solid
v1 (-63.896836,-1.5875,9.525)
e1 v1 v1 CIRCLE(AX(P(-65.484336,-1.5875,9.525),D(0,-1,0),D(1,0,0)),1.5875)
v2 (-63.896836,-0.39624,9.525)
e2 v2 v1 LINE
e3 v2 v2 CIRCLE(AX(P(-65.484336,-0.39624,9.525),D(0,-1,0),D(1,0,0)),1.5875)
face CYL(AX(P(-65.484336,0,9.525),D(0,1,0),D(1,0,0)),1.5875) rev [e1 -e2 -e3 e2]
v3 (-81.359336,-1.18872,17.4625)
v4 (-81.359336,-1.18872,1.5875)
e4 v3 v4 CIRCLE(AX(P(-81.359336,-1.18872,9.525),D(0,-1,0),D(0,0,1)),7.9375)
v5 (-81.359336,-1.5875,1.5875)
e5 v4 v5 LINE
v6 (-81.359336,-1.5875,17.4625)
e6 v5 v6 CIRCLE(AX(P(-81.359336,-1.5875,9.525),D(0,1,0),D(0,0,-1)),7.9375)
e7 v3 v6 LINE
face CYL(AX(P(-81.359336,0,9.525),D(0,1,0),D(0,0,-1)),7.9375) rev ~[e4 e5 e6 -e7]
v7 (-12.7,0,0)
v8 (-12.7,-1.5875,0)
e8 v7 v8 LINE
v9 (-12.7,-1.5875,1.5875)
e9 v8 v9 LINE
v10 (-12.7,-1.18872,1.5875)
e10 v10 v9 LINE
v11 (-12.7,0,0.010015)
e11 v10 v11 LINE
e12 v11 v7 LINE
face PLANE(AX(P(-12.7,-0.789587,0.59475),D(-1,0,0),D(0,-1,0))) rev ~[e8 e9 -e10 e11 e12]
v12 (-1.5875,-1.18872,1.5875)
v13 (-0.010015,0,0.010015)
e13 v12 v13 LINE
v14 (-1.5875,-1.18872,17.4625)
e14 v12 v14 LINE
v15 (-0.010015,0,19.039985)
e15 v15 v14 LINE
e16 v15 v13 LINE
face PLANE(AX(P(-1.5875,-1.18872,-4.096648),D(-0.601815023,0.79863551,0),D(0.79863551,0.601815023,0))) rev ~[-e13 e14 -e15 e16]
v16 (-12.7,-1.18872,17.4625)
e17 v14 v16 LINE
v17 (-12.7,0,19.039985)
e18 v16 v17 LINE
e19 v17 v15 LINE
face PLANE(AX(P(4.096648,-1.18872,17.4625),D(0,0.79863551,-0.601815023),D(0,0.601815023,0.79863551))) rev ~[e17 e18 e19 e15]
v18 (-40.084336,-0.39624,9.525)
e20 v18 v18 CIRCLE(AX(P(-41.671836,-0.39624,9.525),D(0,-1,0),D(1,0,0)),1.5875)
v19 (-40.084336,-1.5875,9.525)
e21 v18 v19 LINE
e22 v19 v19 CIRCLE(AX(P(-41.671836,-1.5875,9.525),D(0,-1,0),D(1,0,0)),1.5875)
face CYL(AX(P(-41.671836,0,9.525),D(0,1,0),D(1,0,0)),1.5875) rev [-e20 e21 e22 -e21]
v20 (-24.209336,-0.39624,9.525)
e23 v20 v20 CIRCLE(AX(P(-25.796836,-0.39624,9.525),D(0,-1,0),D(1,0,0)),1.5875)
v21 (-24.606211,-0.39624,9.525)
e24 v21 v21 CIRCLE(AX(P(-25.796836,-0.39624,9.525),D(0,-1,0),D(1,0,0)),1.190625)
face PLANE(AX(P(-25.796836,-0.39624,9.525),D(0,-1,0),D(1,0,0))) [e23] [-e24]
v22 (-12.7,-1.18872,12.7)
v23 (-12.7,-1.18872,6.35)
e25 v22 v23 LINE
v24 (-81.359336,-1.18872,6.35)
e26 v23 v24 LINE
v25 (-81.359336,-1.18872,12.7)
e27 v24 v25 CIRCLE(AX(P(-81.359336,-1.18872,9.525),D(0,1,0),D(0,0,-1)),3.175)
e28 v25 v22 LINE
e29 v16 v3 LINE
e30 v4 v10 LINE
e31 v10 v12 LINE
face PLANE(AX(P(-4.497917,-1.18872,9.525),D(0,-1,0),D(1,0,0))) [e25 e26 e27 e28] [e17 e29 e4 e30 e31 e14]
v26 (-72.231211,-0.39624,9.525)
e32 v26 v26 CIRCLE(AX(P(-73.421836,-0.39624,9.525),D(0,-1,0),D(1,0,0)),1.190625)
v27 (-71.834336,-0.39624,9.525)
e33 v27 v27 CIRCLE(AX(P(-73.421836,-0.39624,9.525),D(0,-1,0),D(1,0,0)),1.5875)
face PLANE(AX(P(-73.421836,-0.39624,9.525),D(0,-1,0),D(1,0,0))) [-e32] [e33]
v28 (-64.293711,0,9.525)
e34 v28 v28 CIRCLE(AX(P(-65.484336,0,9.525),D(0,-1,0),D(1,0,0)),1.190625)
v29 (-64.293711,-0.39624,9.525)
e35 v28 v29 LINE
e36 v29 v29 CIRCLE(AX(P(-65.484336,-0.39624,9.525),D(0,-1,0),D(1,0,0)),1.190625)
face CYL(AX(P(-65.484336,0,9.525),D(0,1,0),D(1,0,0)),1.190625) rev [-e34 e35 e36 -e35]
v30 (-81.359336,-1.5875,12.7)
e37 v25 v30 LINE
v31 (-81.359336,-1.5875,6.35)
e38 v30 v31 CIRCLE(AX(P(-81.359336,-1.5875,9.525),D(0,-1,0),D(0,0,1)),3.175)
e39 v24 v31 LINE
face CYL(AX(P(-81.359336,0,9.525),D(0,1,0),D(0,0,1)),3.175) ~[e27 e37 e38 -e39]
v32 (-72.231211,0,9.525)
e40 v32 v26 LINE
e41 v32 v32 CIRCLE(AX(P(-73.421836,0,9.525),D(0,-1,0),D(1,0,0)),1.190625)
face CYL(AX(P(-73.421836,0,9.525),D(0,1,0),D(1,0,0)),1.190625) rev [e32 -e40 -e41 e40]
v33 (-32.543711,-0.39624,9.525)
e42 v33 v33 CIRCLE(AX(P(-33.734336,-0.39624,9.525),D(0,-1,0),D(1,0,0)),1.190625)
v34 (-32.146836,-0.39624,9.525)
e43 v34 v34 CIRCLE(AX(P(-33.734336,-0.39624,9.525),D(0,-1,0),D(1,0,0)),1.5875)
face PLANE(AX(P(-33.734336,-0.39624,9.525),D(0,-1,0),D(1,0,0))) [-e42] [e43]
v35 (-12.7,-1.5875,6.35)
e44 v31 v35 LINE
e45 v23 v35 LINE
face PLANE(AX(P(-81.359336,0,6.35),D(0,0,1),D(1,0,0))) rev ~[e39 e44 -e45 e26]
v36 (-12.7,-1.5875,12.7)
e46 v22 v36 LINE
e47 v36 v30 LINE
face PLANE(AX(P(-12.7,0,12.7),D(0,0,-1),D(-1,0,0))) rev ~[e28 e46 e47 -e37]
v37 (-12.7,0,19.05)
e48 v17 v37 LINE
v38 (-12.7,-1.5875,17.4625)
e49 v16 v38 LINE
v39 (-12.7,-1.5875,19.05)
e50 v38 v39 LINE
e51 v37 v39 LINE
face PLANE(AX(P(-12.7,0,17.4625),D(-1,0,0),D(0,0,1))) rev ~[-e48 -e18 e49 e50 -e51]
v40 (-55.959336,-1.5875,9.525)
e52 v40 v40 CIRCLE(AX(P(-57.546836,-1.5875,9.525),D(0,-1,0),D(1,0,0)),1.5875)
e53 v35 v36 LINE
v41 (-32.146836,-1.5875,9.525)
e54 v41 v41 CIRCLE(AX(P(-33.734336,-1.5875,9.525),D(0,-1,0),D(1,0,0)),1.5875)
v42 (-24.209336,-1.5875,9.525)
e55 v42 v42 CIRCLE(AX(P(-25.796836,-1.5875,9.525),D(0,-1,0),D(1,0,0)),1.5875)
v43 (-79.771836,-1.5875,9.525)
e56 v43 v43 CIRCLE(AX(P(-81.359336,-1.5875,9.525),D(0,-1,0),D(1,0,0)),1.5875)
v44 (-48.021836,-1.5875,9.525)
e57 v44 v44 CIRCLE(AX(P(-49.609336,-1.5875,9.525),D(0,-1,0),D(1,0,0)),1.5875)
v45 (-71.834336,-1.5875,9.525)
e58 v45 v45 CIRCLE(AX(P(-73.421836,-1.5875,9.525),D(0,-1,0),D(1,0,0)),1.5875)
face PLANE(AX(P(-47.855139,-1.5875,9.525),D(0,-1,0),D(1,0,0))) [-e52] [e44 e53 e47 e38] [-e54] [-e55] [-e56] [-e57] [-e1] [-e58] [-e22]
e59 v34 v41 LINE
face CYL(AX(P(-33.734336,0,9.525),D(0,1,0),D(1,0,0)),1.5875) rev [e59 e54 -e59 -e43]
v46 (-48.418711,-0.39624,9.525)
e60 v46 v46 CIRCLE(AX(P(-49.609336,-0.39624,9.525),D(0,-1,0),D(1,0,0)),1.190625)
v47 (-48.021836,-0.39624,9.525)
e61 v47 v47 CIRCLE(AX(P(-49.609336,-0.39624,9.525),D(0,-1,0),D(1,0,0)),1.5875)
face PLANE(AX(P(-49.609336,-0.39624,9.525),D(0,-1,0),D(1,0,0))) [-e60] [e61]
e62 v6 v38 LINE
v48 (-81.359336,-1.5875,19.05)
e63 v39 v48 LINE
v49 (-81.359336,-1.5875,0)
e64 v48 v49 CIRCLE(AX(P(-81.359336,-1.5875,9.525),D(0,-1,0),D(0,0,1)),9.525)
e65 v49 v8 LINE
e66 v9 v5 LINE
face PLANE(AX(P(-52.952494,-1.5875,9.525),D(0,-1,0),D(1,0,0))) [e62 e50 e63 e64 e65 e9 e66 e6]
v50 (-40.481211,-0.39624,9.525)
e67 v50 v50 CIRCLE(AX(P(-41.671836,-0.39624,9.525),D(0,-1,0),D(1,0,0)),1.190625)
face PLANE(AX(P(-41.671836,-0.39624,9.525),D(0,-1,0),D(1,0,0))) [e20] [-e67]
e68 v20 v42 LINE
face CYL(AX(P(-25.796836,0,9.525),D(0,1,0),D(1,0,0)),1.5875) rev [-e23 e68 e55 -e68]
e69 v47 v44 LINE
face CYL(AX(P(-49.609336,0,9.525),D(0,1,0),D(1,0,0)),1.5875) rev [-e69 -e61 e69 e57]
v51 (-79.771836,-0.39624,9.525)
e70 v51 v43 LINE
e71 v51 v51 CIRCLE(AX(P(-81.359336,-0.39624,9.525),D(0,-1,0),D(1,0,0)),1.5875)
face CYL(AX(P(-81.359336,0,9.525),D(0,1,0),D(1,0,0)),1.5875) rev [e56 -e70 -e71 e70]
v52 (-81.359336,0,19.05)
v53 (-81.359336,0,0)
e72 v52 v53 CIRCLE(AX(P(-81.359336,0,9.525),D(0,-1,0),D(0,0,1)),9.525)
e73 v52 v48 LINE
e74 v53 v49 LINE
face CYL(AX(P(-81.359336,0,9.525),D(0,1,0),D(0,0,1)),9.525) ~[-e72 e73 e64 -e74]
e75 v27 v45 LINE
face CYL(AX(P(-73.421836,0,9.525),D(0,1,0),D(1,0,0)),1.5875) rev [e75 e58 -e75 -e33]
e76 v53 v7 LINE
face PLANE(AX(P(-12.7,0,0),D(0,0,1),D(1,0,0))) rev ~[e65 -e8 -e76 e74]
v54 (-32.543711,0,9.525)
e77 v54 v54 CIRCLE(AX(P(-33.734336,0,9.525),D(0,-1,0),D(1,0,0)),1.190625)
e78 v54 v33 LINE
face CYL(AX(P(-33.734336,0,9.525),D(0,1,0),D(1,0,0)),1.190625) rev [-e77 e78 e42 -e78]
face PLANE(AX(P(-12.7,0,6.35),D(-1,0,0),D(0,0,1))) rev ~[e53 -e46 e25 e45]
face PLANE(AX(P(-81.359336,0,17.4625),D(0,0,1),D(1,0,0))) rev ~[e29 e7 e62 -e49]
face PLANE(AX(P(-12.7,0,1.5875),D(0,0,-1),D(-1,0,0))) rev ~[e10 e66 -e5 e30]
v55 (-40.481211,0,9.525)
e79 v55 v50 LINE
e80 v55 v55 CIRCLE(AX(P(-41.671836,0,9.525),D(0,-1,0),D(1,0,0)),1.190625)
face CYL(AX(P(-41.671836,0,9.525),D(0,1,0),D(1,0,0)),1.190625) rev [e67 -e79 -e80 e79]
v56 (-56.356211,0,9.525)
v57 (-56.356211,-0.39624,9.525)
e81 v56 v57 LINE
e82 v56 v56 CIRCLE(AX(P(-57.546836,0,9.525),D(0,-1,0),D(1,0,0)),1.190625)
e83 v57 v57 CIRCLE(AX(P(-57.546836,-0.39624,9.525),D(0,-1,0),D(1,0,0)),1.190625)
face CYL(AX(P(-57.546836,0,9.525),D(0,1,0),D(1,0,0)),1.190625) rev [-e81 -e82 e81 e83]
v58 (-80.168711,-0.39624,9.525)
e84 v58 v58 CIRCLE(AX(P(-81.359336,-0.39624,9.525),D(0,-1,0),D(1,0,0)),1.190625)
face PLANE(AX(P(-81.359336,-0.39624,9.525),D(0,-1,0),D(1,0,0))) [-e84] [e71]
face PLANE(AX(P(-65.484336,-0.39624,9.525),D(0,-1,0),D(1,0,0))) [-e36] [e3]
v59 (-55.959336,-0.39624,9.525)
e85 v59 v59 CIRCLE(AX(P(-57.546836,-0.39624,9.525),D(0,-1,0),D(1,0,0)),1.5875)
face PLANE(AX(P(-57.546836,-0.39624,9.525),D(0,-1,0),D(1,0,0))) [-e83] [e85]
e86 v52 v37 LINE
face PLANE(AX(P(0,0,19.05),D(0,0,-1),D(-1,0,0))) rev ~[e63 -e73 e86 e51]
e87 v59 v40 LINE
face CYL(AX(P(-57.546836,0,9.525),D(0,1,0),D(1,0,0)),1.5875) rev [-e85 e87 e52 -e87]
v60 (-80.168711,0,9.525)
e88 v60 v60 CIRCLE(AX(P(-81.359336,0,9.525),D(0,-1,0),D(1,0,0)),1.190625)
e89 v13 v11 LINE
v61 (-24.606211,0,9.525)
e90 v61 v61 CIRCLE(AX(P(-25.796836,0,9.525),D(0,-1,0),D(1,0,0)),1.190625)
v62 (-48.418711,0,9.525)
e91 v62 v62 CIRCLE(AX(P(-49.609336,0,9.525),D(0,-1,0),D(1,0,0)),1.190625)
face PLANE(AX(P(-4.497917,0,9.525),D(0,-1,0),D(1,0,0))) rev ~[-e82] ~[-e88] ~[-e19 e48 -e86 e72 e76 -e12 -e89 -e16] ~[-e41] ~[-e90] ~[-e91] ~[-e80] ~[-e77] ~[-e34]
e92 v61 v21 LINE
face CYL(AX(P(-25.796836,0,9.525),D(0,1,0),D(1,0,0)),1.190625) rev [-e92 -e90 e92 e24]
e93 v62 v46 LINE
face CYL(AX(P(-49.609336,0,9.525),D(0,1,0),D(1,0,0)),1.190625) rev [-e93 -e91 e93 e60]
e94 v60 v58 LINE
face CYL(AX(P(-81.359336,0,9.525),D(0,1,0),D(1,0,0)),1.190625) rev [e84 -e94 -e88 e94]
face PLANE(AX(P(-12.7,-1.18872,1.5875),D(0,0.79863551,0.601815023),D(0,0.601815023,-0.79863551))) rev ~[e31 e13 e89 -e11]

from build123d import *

# Parameters (mm, degrees)
F1_DEPTH     = 1.5875
F2_DEPTH     = 1.18872
F0_R         = 1.5875
F3_DEPTH     = 1.5875
F0_R_2       = 1.190625
F4_DEPTH     = 0.39624
F5_DEPTH     = 1.18872
F6_T1_DEPTH  = 27.2432951274
F6_T6_DEPTH  = 16.7966475637
F6_T11_DEPTH = 16.7966475637


# Not quite as in the source:
# - a fillet or chamfer that OpenCascade refuses, or shapes differently, is made with other operations: its cross-section is extruded or revolved along the edge and cut away or added


with BuildPart() as f1:
    # F0 (on Front) → F1 (new body)
    with BuildSketch(Plane.XZ):
        with BuildLine():
            Line((-81.3593362805, 0), (-12.7, 0))
            Line((-12.7, 0), (-12.7, 1.5875))
            Line((-12.7, 1.5875), (-81.3593362805, 1.5875))
            ThreePointArc((-81.3593362805, 1.5875), (-89.2968362805, 9.525), (-81.3593362805, 17.4625))
            Line((-81.3593362805, 17.4625), (-12.7, 17.4625))
            Line((-12.7, 17.4625), (-12.7, 19.05))
            Line((-12.7, 19.05), (-81.3593362805, 19.05))
            ThreePointArc((-81.3593362805, 19.05), (-90.8843362805, 9.525), (-81.3593362805, 0))
        make_face()
    extrude(amount=F1_DEPTH)

    # F0 (on Front) → F2 (join)
    with BuildSketch(Plane.XZ):
        with BuildLine():
            Line((-81.3593362805, 1.5875), (-12.7, 1.5875))
            Line((-12.7, 1.5875), (-1.5875, 1.5875))
            Line((-1.5875, 1.5875), (-1.5875, 17.4625))
            Line((-1.5875, 17.4625), (-12.7, 17.4625))
            Line((-12.7, 17.4625), (-81.3593362805, 17.4625))
            ThreePointArc((-81.3593362805, 17.4625), (-89.2968362805, 9.525), (-81.3593362805, 1.5875))
        make_face()
        with BuildLine():
            ThreePointArc((-81.3593362805, 6.35), (-84.5343362805, 9.525), (-81.3593362805, 12.7))
            Line((-81.3593362805, 12.7), (-12.7, 12.7))
            Line((-12.7, 12.7), (-12.7, 6.35))
            Line((-12.7, 6.35), (-81.3593362805, 6.35))
        make_face(mode=Mode.SUBTRACT)
    extrude(amount=F2_DEPTH)

    # F0 (on Front) → F3 (join)
    with BuildSketch(Plane.XZ):
        with BuildLine():
            Line((-12.7, 12.7), (-81.3593362805, 12.7))
            ThreePointArc((-81.3593362805, 12.7), (-84.5343362805, 9.525), (-81.3593362805, 6.35))
            Line((-81.3593362805, 6.35), (-12.7, 6.35))
            Line((-12.7, 6.35), (-12.7, 12.7))
        make_face()
        with Locations((-81.3593362805, 9.525)):
            Circle(F0_R, mode=Mode.SUBTRACT)
        with Locations((-73.4218362805, 9.525)):
            Circle(F0_R, mode=Mode.SUBTRACT)
        with Locations((-65.4843362805, 9.525)):
            Circle(F0_R, mode=Mode.SUBTRACT)
        with Locations((-57.5468362805, 9.525)):
            Circle(F0_R, mode=Mode.SUBTRACT)
        with Locations((-49.6093362805, 9.525)):
            Circle(F0_R, mode=Mode.SUBTRACT)
        with Locations((-41.6718362805, 9.525)):
            Circle(F0_R, mode=Mode.SUBTRACT)
        with Locations((-33.7343362805, 9.525)):
            Circle(F0_R, mode=Mode.SUBTRACT)
        with Locations((-25.7968362805, 9.525)):
            Circle(F0_R, mode=Mode.SUBTRACT)
    extrude(amount=F3_DEPTH)

    # F0 (on Front) → F4 (join)
    with BuildSketch(Plane.XZ):
        with Locations((-81.3593362805, 9.525)):
            Circle(F0_R)
        with Locations((-81.3593362805, 9.525)):
            Circle(F0_R_2, mode=Mode.SUBTRACT)
        with Locations((-73.4218362805, 9.525)):
            Circle(F0_R)
        with Locations((-73.4218362805, 9.525)):
            Circle(F0_R_2, mode=Mode.SUBTRACT)
        with Locations((-65.4843362805, 9.525)):
            Circle(F0_R)
        with Locations((-65.4843362805, 9.525)):
            Circle(F0_R_2, mode=Mode.SUBTRACT)
        with Locations((-57.5468362805, 9.525)):
            Circle(F0_R)
        with Locations((-57.5468362805, 9.525)):
            Circle(F0_R_2, mode=Mode.SUBTRACT)
        with Locations((-49.6093362805, 9.525)):
            Circle(F0_R)
        with Locations((-49.6093362805, 9.525)):
            Circle(F0_R_2, mode=Mode.SUBTRACT)
        with Locations((-41.6718362805, 9.525)):
            Circle(F0_R)
        with Locations((-41.6718362805, 9.525)):
            Circle(F0_R_2, mode=Mode.SUBTRACT)
        with Locations((-33.7343362805, 9.525)):
            Circle(F0_R)
        with Locations((-33.7343362805, 9.525)):
            Circle(F0_R_2, mode=Mode.SUBTRACT)
        with Locations((-25.7968362805, 9.525)):
            Circle(F0_R)
        with Locations((-25.7968362805, 9.525)):
            Circle(F0_R_2, mode=Mode.SUBTRACT)
    extrude(amount=F4_DEPTH)

    # F0 (on Front) → F5 (join)
    with BuildSketch(Plane.XZ):
        Polygon((-12.7, 0), (0, 0), (0, 19.05), (-12.7, 19.05), (-12.7, 17.4625), (-1.5875, 17.4625), (-1.5875, 1.5875), (-12.7, 1.5875), align=None)
    extrude(amount=F5_DEPTH)

    # F6: chamfer of 1.5875 x 1.1962670545 on 3 edges, made by hand

    # F6_s2 → F6_t1 (cut)
    with BuildSketch(Plane.XY.offset(-4.0966475637)):
        Polygon((-1.5875, -1.18872), (0, 0.0075470545), (0, -1.18872), align=None)
    extrude(amount=F6_T1_DEPTH, mode=Mode.SUBTRACT)


with BuildPart() as f6_tool4:
    # F6_s5 → F6_t6 (new body)
    with BuildSketch(Plane.YZ.offset(4.0966475637)):
        Polygon((-1.18872, 17.4625), (0.0075470545, 19.05), (-1.18872, 19.05), align=None)
    extrude(amount=-F6_T6_DEPTH)

    split(bisect_by=Plane.XY.offset(17.4625), keep=Keep.TOP)


with BuildPart() as f1_1:
    add(f1.part)

    # F6_t3: cut F6_tool4
    add(f6_tool4.part, mode=Mode.SUBTRACT)


with BuildPart() as f6_tool9:
    # F6_s10 → F6_t11 (new body)
    with BuildSketch(Plane.YZ.offset(-12.7)):
        Polygon((-1.18872, 1.5875), (0.0075470545, 0), (-1.18872, 0), align=None)
    extrude(amount=F6_T11_DEPTH)

    split(bisect_by=Plane.XY.offset(1.5875), keep=Keep.BOTTOM)


with BuildPart() as f1_2:
    add(f1_1.part)

    # F6_t8: cut F6_tool9
    add(f6_tool9.part, mode=Mode.SUBTRACT)


solid = f1_2.part
